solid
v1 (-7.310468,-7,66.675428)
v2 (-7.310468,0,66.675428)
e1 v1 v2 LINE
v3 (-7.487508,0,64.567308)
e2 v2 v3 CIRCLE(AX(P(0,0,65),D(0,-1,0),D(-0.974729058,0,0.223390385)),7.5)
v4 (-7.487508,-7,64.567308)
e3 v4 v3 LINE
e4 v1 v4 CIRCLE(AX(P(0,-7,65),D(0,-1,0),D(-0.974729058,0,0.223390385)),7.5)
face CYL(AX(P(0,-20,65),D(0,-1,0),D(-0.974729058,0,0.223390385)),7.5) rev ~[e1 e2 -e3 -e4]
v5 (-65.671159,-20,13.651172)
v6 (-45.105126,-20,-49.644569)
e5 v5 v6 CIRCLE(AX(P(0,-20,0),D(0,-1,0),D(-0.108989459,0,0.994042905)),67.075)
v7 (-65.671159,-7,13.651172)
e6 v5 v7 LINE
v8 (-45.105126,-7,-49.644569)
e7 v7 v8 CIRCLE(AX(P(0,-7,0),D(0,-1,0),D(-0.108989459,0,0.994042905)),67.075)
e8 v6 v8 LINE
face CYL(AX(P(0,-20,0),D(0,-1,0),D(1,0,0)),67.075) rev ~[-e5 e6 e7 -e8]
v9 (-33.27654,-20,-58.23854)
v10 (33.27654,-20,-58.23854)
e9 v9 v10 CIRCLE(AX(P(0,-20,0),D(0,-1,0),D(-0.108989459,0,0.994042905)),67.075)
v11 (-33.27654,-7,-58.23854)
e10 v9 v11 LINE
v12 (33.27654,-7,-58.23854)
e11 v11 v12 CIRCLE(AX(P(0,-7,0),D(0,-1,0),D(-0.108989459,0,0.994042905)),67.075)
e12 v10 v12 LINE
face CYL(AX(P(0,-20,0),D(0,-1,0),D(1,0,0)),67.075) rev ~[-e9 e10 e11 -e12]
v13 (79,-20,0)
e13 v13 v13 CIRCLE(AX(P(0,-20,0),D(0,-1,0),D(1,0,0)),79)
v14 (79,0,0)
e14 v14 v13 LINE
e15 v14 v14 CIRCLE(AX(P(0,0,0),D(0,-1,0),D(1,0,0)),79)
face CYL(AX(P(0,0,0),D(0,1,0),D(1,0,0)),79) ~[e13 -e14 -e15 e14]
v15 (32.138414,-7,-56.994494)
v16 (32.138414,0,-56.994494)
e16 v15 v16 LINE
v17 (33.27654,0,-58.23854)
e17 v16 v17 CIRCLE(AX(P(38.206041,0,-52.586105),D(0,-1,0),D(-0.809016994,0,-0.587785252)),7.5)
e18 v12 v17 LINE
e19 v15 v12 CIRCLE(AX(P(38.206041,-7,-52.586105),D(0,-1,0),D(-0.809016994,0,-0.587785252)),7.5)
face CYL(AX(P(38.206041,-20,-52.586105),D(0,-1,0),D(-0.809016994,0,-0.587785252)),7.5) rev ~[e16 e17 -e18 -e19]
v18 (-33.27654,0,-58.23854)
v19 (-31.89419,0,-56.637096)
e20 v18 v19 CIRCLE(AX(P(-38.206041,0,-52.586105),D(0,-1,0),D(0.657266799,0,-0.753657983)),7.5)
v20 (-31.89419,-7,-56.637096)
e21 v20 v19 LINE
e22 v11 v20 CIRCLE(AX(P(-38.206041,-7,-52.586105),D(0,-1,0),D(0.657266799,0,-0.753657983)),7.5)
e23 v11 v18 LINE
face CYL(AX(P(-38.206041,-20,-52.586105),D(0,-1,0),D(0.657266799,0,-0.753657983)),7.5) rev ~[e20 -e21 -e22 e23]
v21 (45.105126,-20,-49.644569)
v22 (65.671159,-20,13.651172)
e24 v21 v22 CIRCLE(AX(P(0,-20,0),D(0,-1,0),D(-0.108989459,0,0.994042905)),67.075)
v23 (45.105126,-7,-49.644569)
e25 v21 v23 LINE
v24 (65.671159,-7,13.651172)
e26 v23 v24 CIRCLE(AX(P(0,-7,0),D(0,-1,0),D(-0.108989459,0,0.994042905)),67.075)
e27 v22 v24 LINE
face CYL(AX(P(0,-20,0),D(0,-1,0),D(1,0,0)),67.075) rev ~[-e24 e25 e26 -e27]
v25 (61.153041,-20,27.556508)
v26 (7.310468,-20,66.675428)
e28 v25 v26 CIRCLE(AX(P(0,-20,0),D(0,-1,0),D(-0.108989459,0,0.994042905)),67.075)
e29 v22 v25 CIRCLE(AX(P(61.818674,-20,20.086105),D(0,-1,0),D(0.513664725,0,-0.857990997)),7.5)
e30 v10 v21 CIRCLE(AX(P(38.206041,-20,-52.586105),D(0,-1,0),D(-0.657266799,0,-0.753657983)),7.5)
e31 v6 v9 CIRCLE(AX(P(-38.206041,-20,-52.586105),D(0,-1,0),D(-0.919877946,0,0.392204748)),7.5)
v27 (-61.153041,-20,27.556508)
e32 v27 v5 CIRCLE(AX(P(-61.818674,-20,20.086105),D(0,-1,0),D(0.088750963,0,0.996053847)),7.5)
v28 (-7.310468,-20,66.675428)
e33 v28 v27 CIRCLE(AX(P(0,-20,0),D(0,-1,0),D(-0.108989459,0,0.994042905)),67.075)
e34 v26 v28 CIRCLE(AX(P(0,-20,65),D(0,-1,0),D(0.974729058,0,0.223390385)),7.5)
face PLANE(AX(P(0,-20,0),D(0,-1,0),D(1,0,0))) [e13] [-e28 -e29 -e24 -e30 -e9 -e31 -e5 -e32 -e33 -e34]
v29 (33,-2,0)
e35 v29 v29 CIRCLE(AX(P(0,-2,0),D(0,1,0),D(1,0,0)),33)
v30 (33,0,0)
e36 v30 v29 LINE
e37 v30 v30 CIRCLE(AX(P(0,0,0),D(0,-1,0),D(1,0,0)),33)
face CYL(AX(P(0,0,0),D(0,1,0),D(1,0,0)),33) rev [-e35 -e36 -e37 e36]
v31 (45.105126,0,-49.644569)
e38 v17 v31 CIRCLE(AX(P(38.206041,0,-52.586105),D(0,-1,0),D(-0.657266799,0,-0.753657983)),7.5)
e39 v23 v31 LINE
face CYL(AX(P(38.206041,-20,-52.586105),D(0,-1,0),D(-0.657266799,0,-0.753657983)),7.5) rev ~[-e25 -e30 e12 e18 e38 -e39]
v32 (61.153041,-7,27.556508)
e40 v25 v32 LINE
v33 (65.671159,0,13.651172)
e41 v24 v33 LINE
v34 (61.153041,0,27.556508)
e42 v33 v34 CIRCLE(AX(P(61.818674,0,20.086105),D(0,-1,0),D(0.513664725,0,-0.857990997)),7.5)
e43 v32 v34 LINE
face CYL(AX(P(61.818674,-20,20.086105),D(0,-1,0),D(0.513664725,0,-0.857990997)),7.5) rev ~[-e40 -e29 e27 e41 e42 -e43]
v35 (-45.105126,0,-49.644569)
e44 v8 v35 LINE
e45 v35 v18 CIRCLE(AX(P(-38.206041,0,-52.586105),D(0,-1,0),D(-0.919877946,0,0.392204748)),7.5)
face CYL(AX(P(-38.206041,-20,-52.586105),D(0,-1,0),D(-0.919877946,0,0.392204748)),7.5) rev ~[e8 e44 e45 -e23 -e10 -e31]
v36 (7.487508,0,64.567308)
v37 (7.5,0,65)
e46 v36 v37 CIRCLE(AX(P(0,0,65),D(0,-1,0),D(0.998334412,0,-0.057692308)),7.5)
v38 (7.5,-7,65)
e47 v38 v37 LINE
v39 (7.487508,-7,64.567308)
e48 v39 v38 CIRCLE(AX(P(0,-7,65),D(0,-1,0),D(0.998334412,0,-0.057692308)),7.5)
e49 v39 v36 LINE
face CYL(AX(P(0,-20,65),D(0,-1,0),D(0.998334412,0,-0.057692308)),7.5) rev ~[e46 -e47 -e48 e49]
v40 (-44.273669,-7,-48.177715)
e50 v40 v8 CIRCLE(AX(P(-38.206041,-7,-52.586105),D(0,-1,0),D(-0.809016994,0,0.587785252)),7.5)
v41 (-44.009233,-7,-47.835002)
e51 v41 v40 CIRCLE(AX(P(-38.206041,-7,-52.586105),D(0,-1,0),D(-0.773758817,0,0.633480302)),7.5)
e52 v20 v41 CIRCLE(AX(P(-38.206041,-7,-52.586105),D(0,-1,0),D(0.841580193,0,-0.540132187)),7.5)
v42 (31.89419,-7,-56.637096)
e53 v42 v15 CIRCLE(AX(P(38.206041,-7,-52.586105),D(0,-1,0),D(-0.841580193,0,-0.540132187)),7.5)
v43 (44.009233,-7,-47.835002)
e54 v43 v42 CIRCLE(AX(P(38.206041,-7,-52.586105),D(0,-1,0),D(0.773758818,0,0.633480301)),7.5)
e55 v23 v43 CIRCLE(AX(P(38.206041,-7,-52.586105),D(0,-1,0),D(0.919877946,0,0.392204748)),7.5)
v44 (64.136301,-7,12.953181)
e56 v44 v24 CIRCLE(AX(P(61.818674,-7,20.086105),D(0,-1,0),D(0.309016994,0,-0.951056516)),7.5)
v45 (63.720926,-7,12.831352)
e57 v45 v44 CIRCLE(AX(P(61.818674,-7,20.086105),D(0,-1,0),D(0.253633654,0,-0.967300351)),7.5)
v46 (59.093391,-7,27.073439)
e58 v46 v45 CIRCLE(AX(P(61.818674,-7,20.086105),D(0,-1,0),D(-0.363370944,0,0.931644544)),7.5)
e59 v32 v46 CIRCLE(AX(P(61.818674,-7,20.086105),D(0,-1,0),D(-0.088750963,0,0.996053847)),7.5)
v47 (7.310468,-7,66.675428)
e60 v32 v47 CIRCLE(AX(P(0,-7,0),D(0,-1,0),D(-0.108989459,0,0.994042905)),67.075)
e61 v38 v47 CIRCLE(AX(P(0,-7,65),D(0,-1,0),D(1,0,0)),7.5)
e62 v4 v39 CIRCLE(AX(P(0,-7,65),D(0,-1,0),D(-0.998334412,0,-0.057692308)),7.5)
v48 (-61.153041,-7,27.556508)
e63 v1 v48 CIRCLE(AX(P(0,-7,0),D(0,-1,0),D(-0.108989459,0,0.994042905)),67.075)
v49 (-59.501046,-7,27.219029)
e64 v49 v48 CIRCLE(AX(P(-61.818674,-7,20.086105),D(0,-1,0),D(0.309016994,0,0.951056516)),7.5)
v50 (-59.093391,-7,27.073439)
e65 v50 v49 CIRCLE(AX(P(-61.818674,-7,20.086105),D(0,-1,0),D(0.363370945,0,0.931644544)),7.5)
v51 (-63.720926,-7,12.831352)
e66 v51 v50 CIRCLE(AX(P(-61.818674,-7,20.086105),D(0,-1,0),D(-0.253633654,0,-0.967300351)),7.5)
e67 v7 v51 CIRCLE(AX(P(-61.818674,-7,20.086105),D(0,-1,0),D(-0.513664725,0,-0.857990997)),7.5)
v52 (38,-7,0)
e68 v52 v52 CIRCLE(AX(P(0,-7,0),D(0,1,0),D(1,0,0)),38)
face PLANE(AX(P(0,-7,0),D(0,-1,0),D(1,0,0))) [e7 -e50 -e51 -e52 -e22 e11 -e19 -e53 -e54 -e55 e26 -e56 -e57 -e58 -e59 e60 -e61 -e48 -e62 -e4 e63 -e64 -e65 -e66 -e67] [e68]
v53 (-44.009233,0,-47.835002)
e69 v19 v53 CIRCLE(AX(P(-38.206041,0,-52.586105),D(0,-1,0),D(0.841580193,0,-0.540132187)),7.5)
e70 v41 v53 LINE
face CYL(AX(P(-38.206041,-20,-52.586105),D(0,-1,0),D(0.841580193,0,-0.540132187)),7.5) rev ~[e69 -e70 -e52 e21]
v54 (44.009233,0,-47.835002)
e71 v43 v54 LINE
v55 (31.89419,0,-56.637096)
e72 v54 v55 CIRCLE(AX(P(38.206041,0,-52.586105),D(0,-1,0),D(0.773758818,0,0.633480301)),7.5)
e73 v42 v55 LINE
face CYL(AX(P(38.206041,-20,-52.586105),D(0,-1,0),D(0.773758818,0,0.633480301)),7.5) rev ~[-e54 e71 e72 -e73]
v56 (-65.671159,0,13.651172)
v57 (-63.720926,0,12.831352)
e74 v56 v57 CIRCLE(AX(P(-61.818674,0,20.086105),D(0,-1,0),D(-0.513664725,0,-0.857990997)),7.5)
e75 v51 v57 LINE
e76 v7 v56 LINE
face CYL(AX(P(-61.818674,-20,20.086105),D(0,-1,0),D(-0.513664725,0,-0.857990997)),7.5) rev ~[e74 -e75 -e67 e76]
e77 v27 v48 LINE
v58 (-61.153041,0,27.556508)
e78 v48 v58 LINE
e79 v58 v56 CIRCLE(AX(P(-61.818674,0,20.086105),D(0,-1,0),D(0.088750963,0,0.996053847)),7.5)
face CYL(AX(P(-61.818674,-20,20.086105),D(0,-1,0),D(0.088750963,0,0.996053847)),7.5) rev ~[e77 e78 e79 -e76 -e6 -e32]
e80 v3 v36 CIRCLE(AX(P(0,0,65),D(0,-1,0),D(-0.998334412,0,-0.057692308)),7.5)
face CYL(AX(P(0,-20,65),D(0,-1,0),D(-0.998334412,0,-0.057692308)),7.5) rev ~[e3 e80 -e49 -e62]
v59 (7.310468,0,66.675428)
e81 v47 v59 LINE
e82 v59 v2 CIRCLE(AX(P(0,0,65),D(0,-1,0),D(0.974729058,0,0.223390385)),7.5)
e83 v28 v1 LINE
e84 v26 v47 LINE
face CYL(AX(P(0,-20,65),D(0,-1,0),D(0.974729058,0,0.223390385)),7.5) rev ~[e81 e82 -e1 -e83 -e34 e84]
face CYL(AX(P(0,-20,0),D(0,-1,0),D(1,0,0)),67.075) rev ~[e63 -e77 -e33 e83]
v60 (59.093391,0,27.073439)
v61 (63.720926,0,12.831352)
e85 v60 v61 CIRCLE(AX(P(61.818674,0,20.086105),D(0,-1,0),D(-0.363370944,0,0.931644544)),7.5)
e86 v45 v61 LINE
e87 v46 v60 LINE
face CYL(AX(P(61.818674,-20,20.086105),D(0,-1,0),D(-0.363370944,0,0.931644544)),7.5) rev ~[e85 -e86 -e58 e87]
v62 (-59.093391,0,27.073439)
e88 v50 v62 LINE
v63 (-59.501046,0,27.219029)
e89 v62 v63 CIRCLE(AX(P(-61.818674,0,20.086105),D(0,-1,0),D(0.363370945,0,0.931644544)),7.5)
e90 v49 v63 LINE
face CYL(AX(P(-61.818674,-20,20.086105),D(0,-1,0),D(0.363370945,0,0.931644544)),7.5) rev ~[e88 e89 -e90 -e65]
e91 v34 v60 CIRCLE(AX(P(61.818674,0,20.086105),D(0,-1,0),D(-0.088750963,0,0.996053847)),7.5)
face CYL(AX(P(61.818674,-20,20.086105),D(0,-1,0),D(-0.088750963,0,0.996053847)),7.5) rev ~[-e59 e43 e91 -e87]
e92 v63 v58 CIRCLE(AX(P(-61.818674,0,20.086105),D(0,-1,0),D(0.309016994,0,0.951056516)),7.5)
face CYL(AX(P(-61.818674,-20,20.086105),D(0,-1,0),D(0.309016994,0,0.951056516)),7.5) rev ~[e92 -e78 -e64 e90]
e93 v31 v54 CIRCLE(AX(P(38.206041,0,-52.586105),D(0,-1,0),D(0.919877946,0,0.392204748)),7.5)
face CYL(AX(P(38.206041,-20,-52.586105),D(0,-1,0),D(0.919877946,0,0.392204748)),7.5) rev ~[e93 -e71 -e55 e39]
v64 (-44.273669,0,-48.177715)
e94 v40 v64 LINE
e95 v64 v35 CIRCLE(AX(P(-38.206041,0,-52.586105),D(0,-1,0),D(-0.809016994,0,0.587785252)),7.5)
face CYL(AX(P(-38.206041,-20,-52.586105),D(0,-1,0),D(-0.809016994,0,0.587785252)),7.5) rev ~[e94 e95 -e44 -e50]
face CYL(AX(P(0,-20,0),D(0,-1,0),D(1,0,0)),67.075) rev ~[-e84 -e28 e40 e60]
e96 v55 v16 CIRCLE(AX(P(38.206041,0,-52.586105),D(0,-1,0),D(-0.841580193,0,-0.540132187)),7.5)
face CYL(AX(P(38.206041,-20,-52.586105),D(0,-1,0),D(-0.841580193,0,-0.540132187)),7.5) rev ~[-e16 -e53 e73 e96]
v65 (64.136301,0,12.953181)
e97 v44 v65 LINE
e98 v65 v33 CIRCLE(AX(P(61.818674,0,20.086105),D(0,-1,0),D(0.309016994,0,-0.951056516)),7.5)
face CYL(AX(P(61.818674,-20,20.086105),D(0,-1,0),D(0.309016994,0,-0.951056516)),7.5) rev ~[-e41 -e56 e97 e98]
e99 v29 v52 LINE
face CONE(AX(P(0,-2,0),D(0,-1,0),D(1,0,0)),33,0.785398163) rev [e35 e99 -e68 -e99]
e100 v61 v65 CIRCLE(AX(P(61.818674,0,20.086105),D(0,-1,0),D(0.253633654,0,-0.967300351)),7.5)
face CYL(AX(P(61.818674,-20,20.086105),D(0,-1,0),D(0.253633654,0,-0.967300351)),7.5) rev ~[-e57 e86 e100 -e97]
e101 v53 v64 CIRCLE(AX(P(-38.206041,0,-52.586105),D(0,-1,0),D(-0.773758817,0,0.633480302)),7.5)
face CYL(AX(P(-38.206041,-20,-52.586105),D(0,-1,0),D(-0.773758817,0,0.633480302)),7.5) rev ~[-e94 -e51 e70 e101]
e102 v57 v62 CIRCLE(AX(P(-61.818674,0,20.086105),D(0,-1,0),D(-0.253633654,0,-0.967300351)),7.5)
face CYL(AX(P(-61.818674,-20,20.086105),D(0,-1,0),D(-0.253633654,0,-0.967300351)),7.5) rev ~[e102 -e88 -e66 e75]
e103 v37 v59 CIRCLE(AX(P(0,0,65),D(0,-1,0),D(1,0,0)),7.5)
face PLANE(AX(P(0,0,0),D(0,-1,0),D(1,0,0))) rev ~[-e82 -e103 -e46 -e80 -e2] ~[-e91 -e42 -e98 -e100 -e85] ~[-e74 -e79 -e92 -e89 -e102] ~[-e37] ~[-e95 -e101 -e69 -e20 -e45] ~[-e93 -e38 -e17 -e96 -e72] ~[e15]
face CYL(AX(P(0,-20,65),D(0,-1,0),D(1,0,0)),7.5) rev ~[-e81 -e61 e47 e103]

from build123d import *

# Parameters (mm, degrees)
F0_R            = 79
F0_R_2          = 33
F1_DEPTH        = 20
F2_R            = 67.075
F3_DEPTH        = 13
F4_SIZE         = 5
F6_DEPTH        = 20.001
F6_COPIES_COUNT = 5


# Not quite as in the source:
# - a pattern or mirror of a feature is missing from the dataset's text; its kind, count and spacing are read off the source's solid


with BuildPart() as f1:
    # F0 (on Front) → F1 (new body)
    with BuildSketch(Plane.XZ):
        Circle(F0_R)
        Circle(F0_R_2, mode=Mode.SUBTRACT)
    extrude(amount=F1_DEPTH)

    # F2 (on face) → F3 (cut)
    with BuildSketch(Plane.XZ.offset(20)):
        Circle(F2_R)
    extrude(amount=-F3_DEPTH, mode=Mode.SUBTRACT)

    # F4
    f4_edges = [f1.edges().sort_by_distance(p)[0] for p in [
        (-33, -7, 0),
    ]]
    chamfer(f4_edges, length=F4_SIZE)

    # F5 (on face) → F6 (cut, through all)
    with BuildSketch(Plane.XZ.offset(20)):
        with BuildLine():
            ThreePointArc((-7.4875080879, 64.5673076923), (0, 57.5), (7.4875080879, 64.5673076923))
            ThreePointArc((7.4875080879, 64.5673076923), (0, 65), (-7.4875080879, 64.5673076923))
        make_face()
        with BuildLine():
            ThreePointArc((-7.4875080879, 64.5673076923), (0, 65), (7.4875080879, 64.5673076923))
            ThreePointArc((7.4875080879, 64.5673076923), (7.4968763715, 64.7835637039), (7.5, 65))
            ThreePointArc((7.5, 65), (7.4524663535, 65.843057086), (7.3104679333, 66.6754278846))
            ThreePointArc((7.3104679333, 66.6754278846), (0, 67.075), (-7.3104679333, 66.6754278846))
            ThreePointArc((-7.3104679333, 66.6754278846), (-7.4736916091, 65.6276414045), (-7.4875080879, 64.5673076923))
        make_face()
        with BuildLine():
            ThreePointArc((7.3104679333, 66.6754278846), (0, 72.5), (-7.3104679333, 66.6754278846))
            ThreePointArc((-7.3104679333, 66.6754278846), (0, 67.075), (7.3104679333, 66.6754278846))
        make_face()
    f6 = extrude(amount=-F6_DEPTH, mode=Mode.SUBTRACT)

    # F6_copies: F6 ×5 about axis
    f6_copies_axis = Axis((0, 0, 0), (0, 1, 0))
    for i in range(1, F6_COPIES_COUNT):
        add(f6.rotate(f6_copies_axis, i * 360 / F6_COPIES_COUNT), mode=Mode.SUBTRACT)


solid = f1.part
